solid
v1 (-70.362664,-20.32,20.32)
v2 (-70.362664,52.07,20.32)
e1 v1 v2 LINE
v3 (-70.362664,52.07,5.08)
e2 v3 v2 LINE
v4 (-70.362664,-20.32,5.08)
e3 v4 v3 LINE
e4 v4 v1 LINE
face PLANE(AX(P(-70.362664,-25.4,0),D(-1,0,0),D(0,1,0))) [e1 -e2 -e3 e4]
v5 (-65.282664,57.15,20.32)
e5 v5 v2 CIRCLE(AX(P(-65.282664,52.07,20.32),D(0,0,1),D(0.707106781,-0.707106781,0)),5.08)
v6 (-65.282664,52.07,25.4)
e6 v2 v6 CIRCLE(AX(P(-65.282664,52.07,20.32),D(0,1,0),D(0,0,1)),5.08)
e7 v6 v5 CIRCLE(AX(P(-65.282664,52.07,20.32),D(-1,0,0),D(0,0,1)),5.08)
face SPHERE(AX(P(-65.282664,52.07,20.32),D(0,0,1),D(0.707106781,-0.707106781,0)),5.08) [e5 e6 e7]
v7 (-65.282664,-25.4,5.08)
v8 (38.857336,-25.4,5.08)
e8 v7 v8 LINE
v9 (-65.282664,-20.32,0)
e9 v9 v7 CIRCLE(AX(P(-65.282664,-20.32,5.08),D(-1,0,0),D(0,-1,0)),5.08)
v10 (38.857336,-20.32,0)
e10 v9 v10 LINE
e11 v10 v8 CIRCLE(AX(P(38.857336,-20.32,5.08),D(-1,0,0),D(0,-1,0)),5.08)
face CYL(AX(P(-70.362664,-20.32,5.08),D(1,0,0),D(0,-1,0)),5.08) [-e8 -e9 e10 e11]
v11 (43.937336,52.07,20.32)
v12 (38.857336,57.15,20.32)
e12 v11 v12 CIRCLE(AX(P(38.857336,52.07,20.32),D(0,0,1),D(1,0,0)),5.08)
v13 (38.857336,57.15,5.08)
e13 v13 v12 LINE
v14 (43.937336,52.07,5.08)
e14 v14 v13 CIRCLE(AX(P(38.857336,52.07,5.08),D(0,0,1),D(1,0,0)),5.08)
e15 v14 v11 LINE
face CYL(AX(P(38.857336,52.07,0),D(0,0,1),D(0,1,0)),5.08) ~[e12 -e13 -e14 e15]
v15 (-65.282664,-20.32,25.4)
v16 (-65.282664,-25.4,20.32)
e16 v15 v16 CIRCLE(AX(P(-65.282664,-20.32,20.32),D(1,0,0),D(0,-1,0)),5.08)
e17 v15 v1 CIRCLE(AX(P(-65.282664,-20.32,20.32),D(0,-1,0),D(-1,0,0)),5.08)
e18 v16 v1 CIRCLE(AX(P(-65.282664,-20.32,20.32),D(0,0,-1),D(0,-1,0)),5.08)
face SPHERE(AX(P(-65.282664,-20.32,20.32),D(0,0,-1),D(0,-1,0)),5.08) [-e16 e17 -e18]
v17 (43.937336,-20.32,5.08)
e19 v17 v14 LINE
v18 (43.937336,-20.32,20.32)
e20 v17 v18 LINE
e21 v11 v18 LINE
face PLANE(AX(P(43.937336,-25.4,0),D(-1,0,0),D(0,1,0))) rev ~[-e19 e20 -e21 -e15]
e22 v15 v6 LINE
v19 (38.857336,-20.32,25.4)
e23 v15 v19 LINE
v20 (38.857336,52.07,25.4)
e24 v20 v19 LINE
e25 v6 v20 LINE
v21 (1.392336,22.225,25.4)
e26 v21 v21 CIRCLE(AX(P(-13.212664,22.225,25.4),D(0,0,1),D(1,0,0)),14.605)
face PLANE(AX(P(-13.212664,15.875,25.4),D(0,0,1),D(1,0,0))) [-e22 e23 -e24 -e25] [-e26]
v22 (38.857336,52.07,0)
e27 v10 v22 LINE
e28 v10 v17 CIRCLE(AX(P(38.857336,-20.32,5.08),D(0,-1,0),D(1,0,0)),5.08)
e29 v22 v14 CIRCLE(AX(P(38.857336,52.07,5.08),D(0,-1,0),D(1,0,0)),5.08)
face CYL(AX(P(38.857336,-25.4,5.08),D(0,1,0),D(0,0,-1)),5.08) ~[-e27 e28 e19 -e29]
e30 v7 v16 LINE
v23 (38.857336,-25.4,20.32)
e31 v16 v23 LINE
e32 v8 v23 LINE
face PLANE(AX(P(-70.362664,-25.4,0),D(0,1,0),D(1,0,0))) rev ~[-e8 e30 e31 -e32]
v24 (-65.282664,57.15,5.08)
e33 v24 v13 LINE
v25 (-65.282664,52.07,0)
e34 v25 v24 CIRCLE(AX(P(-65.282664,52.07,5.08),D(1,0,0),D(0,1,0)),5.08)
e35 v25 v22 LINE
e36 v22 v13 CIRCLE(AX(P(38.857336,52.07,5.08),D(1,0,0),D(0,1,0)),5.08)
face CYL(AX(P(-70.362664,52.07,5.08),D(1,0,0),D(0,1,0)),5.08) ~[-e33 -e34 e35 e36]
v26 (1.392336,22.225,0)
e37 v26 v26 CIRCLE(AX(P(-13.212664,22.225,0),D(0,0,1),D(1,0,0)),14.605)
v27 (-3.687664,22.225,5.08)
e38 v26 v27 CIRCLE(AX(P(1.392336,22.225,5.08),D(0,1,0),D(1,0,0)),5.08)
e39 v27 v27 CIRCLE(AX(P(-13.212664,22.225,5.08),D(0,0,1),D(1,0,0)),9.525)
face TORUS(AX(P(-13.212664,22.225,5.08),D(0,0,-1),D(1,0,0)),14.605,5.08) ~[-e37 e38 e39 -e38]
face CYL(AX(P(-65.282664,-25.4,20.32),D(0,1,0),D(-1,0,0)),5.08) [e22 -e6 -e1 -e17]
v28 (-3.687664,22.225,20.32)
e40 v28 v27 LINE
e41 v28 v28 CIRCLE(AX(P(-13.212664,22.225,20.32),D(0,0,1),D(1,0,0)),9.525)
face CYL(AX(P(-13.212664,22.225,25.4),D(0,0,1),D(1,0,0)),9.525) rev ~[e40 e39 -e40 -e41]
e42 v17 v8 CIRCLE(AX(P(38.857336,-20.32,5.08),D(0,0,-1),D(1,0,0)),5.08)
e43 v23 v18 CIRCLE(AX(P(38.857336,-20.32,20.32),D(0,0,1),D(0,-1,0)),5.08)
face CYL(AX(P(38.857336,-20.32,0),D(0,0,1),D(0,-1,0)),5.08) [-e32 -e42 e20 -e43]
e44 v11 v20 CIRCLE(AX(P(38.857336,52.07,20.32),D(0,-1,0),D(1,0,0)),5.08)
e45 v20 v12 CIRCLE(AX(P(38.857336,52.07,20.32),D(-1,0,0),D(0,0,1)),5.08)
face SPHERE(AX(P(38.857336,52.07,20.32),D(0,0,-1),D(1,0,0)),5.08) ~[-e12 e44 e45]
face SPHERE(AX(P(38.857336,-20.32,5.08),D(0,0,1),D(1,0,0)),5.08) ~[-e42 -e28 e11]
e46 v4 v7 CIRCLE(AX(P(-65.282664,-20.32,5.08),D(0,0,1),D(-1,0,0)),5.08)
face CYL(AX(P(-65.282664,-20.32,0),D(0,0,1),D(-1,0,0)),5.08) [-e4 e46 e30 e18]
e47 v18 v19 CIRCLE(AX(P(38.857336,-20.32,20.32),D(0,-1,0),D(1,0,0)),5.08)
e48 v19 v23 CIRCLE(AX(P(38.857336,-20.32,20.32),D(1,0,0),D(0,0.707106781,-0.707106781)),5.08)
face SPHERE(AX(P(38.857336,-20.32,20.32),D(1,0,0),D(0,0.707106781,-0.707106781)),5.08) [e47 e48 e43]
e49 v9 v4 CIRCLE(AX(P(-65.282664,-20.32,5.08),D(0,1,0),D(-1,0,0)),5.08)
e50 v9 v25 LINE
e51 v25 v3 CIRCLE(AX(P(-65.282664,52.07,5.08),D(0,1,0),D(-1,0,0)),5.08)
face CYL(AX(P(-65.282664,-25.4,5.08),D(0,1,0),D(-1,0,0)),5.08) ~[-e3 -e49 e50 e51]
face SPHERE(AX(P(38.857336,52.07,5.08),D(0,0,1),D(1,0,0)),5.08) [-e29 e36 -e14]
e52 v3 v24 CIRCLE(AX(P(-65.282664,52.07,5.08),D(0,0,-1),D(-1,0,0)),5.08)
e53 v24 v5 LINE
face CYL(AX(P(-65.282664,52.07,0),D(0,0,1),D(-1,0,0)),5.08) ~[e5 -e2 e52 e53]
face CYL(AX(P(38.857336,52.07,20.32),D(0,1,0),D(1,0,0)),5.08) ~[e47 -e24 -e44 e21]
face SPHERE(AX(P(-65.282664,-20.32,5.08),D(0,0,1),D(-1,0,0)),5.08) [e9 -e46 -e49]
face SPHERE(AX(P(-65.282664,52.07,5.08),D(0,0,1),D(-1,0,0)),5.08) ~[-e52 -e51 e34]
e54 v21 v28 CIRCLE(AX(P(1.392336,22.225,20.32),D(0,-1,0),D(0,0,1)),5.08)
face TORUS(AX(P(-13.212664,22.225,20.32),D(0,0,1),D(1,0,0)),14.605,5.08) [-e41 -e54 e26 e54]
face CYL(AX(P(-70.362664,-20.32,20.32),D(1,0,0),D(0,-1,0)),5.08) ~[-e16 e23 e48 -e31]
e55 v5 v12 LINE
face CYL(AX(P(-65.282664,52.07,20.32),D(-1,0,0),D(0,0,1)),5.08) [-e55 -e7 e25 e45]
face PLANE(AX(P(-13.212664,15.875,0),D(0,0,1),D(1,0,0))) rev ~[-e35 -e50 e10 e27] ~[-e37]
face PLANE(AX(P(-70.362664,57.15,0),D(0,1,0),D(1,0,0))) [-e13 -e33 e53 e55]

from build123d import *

# Parameters (mm, degrees)
F0_W         = 114.3
F0_H         = 82.55
F1_DEPTH     = 25.4
F2_R         = 9.525
F3_DEPTH     = 45.21898
F4_R         = 5.08
F5_T1_DEPTH  = 104.14
F5_T3_DEPTH  = 72.39
F5_S7_W      = 5.08
F5_S7_H      = 5.08
F5_T8_DEPTH  = 5.08
F5_S13_W     = 5.08
F5_S13_H     = 5.08
F5_T14_DEPTH = 5.08
F5_T20_ANGLE = 90


# Not quite as in the source:
# - a fillet or chamfer that OpenCascade refuses, or shapes differently, is made with other operations: its cross-section is extruded or revolved along the edge and cut away or added


with BuildPart() as f1:
    # F0 (on Top) → F1 (new body)
    with BuildSketch(Plane.XY):
        with Locations((-13.2126640528, 15.875)):
            Rectangle(F0_W, F0_H)
    extrude(amount=F1_DEPTH)

    # F2 (on face) → F3 (cut)
    with BuildSketch(Plane.XY.offset(25.4)):
        with Locations((-13.2126640528, 22.225)):
            Circle(F2_R)
    extrude(amount=-F3_DEPTH, mode=Mode.SUBTRACT)

    # F4
    f4_edges = [f1.edges().sort_by_distance(p)[0] for p in [
        (43.937336, 57.15, 12.7),
        (-70.362664, 57.15, 12.7),
        (43.937336, -25.4, 12.7),
        (-70.362664, -25.4, 12.7),
        (-13.212664, -25.4, 25.4),
        (-70.362664, 15.875, 25.4),
        (-70.362664, 15.875, 0),
        (43.937336, 15.875, 0),
        (-13.212664, -25.4, 0),
        (-13.212664, 57.15, 0),
        (-22.737664, 22.225, 0),
    ]]
    fillet(f4_edges, radius=F4_R)

    # F5: fillet of radius 5.08 on 2 edges, made by hand

    # F5_s2 → F5_t1 (cut)
    with BuildSketch(Plane.YZ.offset(-65.2826640528)):
        with BuildLine():
            ThreePointArc((52.07, 25.4), (55.6621024484, 23.9121024484), (57.15, 20.32))
            Line((57.15, 20.32), (57.15, 25.4))
            Line((57.15, 25.4), (52.07, 25.4))
        make_face()
    extrude(amount=F5_T1_DEPTH, mode=Mode.SUBTRACT)

    # F5_s4 → F5_t3 (cut)
    with BuildSketch(Plane.XZ.offset(-52.07)):
        with BuildLine():
            ThreePointArc((43.9373359472, 20.32), (42.4494383956, 23.9121024484), (38.8573359472, 25.4))
            Line((38.8573359472, 25.4), (43.9373359472, 25.4))
            Line((43.9373359472, 25.4), (43.9373359472, 20.32))
        make_face()
    extrude(amount=F5_T3_DEPTH, mode=Mode.SUBTRACT)


with BuildPart() as f5_tool6:
    # F5_s7 → F5_t8 (new body)
    with BuildSketch(Plane.XY.offset(20.32)):
        with Locations((-67.8226640528, 54.61)):
            Rectangle(F5_S7_W, F5_S7_H)
    extrude(amount=F5_T8_DEPTH)

    # F5_s9 → F5_t10 (revolve, cut)
    with BuildSketch(Plane(origin=(-65.2826640528, 52.07, 20.32), x_dir=(0.7071067812, -0.7071067812, 0), z_dir=(-0.7071067812, -0.7071067812, 0))):
        with BuildLine():
            ThreePointArc((0, -5.08), (5.08, 0), (0, 5.08))
            Line((0, 5.08), (0, -5.08))
        make_face()
    revolve(axis=Axis((-65.2826640528, 52.07, 20.32), (0, 0, 1)), mode=Mode.SUBTRACT)


with BuildPart() as f1_1:
    add(f1.part)

    # F5_t5: cut F5_tool6
    add(f5_tool6.part, mode=Mode.SUBTRACT)


with BuildPart() as f5_tool12:
    # F5_s13 → F5_t14 (new body)
    with BuildSketch(Plane.YZ.offset(38.8573359472)):
        with Locations((-22.86, 22.86)):
            Rectangle(F5_S13_W, F5_S13_H)
    extrude(amount=F5_T14_DEPTH)

    # F5_s15 → F5_t16 (revolve, cut)
    with BuildSketch(Plane(origin=(38.8573359472, -20.32, 20.32), x_dir=(0, 0.7071067812, -0.7071067812), z_dir=(0, -0.7071067812, -0.7071067812))):
        with BuildLine():
            ThreePointArc((0, -5.08), (5.08, 0), (0, 5.08))
            Line((0, 5.08), (0, -5.08))
        make_face()
    revolve(axis=Axis((38.8573359472, -20.32, 20.32), (1, 0, 0)), mode=Mode.SUBTRACT)


with BuildPart() as f1_2:
    add(f1_1.part)

    # F5_t11: cut F5_tool12
    add(f5_tool12.part, mode=Mode.SUBTRACT)

    # F5_s17 → F5_t18 (revolve, cut)
    with BuildSketch(Plane.XZ.offset(-22.225)):
        with BuildLine():
            ThreePointArc((1.3923359472, 25.4), (-2.1997665013, 23.9121024484), (-3.6876640528, 20.32))
            Line((-3.6876640528, 20.32), (-3.6876640528, 25.4))
            Line((-3.6876640528, 25.4), (1.3923359472, 25.4))
        make_face()
    revolve(axis=Axis((-13.2126640528, 22.225, 25.4), (0, 0, 1)), mode=Mode.SUBTRACT)

    # F5_s19 → F5_t20 (revolve, cut)
    with BuildSketch(Plane.XZ.offset(-52.07)):
        with BuildLine():
            ThreePointArc((38.8573359472, 25.4), (42.4494383956, 23.9121024484), (43.9373359472, 20.32))
            Line((43.9373359472, 20.32), (43.9373359472, 25.4))
            Line((43.9373359472, 25.4), (38.8573359472, 25.4))
        make_face()
    revolve(axis=Axis((38.8573359472, 52.07, 25.4), (0, 0, 1)), revolution_arc=F5_T20_ANGLE, mode=Mode.SUBTRACT)


solid = f1_2.part
